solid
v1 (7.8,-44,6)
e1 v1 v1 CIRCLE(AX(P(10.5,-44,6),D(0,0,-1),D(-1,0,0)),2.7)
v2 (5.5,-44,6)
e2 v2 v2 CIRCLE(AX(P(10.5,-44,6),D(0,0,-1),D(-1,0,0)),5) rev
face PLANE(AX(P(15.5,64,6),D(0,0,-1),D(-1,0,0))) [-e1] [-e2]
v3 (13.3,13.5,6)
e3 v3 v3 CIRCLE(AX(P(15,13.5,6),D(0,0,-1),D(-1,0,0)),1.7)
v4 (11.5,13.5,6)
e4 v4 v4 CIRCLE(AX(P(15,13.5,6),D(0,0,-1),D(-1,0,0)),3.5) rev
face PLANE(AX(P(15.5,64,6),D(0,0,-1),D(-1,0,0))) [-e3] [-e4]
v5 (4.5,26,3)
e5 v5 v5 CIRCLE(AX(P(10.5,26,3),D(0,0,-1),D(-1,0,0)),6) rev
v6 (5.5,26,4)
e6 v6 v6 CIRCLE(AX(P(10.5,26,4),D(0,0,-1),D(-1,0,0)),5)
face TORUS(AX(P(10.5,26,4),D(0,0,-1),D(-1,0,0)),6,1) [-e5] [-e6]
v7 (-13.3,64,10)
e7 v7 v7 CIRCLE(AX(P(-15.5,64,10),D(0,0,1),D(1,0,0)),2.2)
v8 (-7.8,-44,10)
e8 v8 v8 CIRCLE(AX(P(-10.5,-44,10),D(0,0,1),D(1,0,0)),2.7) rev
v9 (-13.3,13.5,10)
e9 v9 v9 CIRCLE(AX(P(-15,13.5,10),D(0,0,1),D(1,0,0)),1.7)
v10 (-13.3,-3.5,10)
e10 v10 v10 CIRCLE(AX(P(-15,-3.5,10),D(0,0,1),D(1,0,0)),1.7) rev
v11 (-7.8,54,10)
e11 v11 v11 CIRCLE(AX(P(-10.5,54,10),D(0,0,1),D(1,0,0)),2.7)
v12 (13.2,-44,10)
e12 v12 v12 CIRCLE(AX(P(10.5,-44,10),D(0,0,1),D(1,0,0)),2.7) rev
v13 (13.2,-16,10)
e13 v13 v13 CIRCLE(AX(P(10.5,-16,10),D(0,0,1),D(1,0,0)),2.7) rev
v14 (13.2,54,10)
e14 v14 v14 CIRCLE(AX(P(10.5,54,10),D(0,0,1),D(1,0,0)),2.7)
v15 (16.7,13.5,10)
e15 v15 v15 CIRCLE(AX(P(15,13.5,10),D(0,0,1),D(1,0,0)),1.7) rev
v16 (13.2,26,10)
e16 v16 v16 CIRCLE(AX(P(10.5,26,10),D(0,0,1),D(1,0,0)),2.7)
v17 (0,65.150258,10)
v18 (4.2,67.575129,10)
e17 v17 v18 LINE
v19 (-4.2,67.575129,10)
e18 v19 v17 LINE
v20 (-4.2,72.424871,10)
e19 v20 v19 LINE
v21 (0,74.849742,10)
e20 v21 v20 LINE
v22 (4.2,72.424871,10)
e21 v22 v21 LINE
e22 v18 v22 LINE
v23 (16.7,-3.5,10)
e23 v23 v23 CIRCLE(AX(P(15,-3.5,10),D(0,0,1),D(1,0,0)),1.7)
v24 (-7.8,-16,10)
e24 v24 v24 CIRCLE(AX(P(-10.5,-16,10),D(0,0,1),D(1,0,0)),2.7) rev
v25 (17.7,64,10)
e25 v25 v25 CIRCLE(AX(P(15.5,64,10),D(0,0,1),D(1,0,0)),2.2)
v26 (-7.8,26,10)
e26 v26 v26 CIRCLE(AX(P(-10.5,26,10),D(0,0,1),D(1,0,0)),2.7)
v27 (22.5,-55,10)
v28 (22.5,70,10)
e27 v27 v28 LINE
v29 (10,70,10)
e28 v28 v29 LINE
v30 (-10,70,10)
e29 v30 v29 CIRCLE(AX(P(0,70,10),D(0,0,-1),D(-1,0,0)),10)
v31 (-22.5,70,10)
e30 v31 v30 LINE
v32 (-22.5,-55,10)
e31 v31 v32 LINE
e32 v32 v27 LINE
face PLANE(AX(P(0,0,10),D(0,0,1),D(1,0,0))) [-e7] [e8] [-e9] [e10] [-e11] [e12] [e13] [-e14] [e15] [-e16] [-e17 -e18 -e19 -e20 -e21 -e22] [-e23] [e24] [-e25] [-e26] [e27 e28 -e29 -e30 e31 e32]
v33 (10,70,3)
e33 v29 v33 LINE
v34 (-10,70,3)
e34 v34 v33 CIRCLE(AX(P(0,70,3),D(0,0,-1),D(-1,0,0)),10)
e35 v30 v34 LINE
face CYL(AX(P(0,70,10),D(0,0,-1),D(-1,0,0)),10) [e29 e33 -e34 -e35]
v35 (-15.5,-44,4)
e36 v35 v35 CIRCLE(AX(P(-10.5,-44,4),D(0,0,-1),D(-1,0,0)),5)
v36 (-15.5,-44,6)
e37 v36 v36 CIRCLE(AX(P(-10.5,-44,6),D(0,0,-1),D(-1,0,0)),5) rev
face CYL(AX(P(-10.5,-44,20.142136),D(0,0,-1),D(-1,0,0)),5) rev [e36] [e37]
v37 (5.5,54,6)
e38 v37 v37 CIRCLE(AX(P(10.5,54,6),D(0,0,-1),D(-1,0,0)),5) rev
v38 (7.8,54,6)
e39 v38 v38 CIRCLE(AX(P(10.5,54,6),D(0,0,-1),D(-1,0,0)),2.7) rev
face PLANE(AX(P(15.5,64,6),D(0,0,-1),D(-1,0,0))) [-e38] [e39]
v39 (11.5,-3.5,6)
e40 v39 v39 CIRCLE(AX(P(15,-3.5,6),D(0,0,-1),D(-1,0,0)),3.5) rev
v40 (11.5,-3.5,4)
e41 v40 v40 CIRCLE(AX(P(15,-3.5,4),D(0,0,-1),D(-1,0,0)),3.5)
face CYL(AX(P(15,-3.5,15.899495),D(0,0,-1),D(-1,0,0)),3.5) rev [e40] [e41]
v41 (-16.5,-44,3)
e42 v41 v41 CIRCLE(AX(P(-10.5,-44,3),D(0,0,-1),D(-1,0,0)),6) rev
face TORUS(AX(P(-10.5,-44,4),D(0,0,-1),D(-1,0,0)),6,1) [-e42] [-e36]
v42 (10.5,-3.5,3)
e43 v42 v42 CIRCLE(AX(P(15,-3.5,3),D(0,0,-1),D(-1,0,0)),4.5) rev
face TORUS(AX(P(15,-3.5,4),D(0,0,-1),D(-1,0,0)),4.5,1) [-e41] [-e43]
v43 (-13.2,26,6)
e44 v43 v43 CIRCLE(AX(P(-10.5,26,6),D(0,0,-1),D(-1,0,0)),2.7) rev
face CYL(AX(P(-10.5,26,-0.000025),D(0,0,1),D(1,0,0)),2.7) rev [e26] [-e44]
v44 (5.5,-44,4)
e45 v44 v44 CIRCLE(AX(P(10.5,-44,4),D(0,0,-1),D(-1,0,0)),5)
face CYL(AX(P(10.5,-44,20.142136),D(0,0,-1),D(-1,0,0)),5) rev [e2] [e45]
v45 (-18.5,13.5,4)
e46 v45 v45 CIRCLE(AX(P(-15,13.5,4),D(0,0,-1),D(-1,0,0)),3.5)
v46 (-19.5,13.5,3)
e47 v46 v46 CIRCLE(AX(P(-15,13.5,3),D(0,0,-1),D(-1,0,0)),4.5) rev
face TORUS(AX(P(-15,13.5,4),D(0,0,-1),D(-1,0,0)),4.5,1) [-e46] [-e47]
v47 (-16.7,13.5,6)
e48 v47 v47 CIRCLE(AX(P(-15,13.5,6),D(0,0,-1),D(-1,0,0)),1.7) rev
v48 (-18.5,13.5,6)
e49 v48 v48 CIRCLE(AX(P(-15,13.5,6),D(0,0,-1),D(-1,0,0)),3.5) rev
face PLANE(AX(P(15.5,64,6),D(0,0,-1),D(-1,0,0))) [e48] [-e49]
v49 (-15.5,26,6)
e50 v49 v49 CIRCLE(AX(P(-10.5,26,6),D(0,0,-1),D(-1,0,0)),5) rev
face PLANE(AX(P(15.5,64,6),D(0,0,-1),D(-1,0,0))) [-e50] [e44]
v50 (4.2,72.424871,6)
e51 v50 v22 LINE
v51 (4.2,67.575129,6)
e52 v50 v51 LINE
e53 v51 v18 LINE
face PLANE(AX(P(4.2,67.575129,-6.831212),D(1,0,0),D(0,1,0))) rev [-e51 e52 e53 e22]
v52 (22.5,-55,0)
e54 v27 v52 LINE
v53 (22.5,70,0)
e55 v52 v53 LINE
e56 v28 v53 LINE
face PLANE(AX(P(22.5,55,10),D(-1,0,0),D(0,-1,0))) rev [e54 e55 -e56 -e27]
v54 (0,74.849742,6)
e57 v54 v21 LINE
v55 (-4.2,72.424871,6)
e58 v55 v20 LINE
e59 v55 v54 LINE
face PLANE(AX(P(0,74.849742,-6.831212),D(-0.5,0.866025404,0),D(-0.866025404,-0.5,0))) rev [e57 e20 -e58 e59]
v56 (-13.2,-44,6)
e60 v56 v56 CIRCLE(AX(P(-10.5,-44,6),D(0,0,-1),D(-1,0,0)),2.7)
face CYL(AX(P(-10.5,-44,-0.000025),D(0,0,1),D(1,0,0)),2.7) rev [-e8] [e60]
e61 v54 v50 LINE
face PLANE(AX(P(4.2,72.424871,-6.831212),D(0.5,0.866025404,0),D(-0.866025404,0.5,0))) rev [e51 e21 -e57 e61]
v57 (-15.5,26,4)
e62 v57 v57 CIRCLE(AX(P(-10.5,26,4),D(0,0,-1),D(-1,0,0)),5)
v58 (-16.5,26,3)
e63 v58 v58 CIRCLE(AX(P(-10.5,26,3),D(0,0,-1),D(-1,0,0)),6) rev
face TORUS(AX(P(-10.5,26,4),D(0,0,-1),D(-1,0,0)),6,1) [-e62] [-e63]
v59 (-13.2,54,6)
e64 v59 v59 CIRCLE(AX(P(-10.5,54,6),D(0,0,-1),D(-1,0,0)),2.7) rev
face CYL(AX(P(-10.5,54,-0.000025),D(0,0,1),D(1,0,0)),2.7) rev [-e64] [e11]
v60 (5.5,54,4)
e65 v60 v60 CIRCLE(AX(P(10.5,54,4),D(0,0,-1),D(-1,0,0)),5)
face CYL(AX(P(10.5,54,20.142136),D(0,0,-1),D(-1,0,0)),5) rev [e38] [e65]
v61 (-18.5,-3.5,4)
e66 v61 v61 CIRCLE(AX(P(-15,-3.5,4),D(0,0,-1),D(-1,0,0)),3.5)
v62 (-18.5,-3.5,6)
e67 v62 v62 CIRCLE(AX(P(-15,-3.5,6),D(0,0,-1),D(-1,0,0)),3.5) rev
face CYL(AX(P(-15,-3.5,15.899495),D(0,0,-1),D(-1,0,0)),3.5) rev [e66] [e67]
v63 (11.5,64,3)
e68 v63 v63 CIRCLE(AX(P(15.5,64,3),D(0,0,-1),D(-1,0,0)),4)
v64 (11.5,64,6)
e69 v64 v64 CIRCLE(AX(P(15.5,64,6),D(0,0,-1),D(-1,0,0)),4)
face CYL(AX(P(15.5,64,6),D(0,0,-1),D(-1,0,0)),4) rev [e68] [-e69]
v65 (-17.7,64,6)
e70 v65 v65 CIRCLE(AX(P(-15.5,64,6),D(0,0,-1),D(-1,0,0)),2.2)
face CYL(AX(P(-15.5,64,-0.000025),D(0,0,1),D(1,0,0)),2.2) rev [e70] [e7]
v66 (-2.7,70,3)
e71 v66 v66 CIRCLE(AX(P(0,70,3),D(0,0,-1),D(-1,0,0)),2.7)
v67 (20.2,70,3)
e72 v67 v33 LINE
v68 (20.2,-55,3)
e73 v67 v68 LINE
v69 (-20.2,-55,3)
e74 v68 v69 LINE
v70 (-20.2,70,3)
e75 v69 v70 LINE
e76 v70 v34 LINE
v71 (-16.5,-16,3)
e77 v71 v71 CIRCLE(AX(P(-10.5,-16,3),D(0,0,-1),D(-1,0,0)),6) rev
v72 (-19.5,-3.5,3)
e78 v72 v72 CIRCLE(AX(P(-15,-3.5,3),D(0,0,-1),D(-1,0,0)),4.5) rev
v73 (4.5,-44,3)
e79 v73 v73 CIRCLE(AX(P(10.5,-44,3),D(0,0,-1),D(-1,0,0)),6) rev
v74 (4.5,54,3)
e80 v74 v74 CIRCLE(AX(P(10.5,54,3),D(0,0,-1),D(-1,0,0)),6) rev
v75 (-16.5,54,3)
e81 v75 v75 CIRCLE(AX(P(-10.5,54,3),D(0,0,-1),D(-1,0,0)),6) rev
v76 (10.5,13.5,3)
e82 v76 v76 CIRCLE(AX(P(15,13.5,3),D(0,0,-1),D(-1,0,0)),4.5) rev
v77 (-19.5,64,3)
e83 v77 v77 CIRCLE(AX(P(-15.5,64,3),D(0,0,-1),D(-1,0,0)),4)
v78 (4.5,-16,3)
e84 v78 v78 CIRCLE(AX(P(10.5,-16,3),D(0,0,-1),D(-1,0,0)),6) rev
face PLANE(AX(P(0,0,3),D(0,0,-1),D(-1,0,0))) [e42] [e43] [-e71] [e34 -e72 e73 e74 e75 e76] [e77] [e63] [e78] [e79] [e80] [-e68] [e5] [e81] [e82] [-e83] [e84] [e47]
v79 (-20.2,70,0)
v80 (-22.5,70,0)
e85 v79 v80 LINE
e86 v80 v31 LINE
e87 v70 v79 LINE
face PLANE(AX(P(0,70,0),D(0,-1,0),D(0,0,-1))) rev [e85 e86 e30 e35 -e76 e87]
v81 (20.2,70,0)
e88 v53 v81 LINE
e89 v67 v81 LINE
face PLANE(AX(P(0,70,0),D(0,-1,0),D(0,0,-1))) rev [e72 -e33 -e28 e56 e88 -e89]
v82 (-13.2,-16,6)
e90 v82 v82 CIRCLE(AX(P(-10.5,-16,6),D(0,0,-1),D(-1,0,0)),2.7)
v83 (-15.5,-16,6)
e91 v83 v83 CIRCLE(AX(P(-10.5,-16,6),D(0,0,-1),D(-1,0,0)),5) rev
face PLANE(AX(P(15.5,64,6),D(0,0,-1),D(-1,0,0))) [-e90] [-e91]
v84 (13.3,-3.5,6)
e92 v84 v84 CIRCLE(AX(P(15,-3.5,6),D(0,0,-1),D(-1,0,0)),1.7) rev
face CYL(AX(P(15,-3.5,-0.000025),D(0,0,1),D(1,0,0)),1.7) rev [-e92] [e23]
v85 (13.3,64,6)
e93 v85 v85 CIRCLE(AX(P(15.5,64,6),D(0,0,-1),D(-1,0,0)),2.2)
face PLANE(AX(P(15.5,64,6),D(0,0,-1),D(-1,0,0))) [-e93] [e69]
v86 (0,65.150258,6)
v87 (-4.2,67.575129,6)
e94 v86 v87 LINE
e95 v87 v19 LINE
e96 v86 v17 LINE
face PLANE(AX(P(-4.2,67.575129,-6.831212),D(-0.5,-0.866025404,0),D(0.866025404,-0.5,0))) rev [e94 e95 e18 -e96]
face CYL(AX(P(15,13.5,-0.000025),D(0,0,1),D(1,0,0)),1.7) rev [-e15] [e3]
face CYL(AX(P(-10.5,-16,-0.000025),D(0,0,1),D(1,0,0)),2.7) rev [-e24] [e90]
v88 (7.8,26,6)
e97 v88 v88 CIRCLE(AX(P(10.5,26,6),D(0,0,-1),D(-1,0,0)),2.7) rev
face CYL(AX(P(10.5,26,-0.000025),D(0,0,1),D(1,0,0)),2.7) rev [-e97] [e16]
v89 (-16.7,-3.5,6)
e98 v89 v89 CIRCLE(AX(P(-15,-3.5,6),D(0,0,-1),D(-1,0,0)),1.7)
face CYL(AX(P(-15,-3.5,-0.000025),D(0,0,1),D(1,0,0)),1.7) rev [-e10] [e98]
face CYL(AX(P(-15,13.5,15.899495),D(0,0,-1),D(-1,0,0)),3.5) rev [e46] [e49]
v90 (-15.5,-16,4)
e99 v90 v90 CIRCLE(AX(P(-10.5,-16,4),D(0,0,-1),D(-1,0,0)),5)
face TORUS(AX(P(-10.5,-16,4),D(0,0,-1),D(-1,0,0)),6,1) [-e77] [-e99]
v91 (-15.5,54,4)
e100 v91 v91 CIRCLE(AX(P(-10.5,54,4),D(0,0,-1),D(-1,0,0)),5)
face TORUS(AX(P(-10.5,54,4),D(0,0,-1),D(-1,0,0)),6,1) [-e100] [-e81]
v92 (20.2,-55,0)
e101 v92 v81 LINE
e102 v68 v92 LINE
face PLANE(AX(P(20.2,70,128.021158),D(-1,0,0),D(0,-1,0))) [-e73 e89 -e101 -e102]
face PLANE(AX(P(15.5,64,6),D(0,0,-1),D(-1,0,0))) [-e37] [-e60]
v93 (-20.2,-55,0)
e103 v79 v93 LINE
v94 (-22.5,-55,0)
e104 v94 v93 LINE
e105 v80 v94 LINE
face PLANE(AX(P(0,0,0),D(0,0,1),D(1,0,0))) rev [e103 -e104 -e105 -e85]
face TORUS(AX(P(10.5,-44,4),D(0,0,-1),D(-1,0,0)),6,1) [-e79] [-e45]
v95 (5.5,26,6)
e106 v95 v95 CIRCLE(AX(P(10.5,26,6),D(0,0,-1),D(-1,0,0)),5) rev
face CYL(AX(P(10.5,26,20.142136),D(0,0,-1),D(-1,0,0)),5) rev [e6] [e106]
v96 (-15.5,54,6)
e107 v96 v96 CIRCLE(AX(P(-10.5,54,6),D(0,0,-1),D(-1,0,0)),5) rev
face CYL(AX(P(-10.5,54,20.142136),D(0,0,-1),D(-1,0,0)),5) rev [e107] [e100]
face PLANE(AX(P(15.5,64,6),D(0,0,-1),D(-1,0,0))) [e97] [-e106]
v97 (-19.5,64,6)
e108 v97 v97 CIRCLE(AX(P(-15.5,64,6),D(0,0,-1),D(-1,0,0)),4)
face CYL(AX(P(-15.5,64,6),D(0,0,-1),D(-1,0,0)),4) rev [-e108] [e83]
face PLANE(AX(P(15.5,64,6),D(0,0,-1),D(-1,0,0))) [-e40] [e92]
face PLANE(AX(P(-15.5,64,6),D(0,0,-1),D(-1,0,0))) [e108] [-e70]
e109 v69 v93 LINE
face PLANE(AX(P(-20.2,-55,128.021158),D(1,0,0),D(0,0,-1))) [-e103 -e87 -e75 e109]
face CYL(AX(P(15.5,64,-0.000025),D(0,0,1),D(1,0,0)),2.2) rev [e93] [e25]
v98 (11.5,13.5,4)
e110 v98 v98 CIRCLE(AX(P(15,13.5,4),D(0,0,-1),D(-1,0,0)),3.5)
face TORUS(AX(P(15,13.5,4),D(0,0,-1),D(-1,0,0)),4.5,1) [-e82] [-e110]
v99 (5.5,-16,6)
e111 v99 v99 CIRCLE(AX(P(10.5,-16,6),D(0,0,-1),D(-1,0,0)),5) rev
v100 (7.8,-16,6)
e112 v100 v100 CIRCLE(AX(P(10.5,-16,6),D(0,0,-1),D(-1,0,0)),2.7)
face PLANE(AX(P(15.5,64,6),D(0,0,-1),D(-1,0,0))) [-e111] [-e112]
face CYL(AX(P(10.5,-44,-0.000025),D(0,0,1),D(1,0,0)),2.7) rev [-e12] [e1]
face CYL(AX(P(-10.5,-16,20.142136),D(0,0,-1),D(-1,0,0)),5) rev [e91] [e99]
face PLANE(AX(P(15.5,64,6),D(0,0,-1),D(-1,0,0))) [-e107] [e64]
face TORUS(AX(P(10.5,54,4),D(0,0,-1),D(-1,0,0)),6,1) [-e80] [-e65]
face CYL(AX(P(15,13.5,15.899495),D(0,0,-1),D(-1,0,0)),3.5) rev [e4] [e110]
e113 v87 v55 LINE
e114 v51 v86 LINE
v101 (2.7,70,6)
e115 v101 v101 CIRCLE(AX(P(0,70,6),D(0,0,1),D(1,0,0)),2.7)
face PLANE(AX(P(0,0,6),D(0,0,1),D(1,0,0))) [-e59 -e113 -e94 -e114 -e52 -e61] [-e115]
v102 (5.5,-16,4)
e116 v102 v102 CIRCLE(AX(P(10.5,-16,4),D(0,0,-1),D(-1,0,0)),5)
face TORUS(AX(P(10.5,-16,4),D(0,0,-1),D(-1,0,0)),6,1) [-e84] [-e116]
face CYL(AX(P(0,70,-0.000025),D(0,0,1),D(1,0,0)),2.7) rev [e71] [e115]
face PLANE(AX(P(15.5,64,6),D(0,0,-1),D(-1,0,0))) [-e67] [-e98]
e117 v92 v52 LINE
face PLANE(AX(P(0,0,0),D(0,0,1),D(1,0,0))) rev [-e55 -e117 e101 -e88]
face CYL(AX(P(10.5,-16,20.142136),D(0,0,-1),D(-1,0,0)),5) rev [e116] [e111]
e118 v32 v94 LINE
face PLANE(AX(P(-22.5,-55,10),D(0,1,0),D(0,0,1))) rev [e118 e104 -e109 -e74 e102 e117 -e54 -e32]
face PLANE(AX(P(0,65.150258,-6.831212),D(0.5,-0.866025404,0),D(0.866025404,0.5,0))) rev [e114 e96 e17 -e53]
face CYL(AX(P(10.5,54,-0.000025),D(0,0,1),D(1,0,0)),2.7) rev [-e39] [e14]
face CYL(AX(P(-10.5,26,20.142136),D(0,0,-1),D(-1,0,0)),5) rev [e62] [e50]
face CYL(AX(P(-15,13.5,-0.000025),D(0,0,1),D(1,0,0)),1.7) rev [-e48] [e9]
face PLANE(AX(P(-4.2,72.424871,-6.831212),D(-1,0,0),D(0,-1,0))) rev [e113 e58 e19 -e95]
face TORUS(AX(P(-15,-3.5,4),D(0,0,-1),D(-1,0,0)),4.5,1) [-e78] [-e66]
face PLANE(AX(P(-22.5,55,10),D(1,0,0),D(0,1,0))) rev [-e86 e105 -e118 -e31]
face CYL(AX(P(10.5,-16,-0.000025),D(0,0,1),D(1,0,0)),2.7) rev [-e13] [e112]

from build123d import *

# Parameters (mm, degrees)
SKETCH_1_W               = 45
SKETCH_1_H               = 110
EXTRUDE_1_DEPTH          = 10
SKETCH_2_W               = 41
SKETCH_2_H               = 110
CUT_EXTRUDE_1_DEPTH      = 3
EXTRUDE_2_DEPTH          = 15
SKETCH_9_R               = 2.5
CUT_EXTRUDE_6_DEPTH      = 75.204110398
CHAMFER_3_SIZE           = 2
EXTRUDE_3_DEPTH          = 10
CUT_EXTRUDE_9_DEPTH      = 84.398141466
CUT_EXTRUDE_10_DEPTH     = 4
SKETCH_14_R              = 2.5
CUT_EXTRUDE_11_DEPTH     = 84.703345214
SKETCH_18_R              = 1.5
CUT_EXTRUDE_12_DEPTH     = 84.703345214
SKETCH_19_R              = 3
CUT_EXTRUDE_13_DEPTH     = 3
SKETCH_20_R              = 4
CUT_EXTRUDE_14_DEPTH     = 3
CHAMFER_4_SIZE           = 1
SKETCH_22_R              = 2
CUT_EXTRUDE_15_DEPTH     = 84.703345214
SKETCH_23_R              = 4
CUT_EXTRUDE_16_DEPTH     = 3
CHAMFER_6_SIZE           = 0.5
SKETCH_24_R              = 2.7
CUT_EXTRUDE_17_DEPTH     = 84.703345214
CUT_EXTRUDE_18_DEPTH     = 4
SKETCH_26_R              = 1.7
CUT_EXTRUDE_19_DEPTH     = 84.703345214
SKETCH_27_R              = 2.2
CUT_EXTRUDE_20_DEPTH     = 84.703345214
SKETCH_28_R              = 4.7
CUT_EXTRUDE_21_DEPTH     = 3
FILLET_1_R               = 1
FILLET_2_R               = 1
SKETCH_29_R              = 5.7
EXTRUDE_4_DEPTH          = 3
SKETCH_30_R              = 2.7
EXTRUDE_5_DEPTH          = 3
CUT_EXTRUDE_START        = -7
CUT_EXTRUDE_22_OUTLINE_R = 2.7
CUT_EXTRUDE_22_DEPTH     = 7
SKETCH_32_R              = 2.7
EXTRUDE_6_DEPTH          = 3
CUT_EXTRUDE_23_OUTLINE_R = 2.7
CUT_EXTRUDE_23_DEPTH     = 7
EXTRUDE_7_REACH          = 85.703
SKETCH_35_R              = 6.776750131
SKETCH_35_R_2            = 7.007153008
SKETCH_35_R_3            = 7.350593446
SKETCH_35_R_4            = 7.056321553
SKETCH_36_R              = 2.7
CUT_EXTRUDE_25_DEPTH     = 84.703345214
EXTRUDE_START            = -7
SKETCH_37_R              = 6.917047826
SKETCH_37_R_2            = 2.7
SKETCH_37_R_3            = 7.137636353
SKETCH_37_R_4            = 7.213157971
SKETCH_37_R_5            = 7.230640972
EXTRUDE_8_DEPTH          = 7
SKETCH_38_R              = 5.066348775
SKETCH_38_R_2            = 5.169326328
SKETCH_38_R_3            = 5.147369905
SKETCH_38_R_4            = 5.241001726
EXTRUDE_9_DEPTH          = 7
SKETCH_39_R              = 1.7
CUT_EXTRUDE_26_DEPTH     = 84.703345214
SKETCH_40_R              = 4.793714361
SKETCH_40_R_2            = 4
SKETCH_40_R_3            = 4.918414757
EXTRUDE_10_DEPTH         = 3
SKETCH_41_R              = 3.5
CUT_EXTRUDE_28_DEPTH     = 3
FILLET_3_R               = 1
SKETCH_42_R              = 5
CUT_EXTRUDE_29_DEPTH     = 3
FILLET_4_R               = 1
SKETCH_43_W              = 2.3
SKETCH_43_H              = 125
EXTRUDE_11_DEPTH         = 3


# Read off the part's stored shape, not the designer's step: Вырез-Вытянуть22, Вырез-Вытянуть23
with BuildPart() as part:
    # Эскиз1 → Бобышка-Вытянуть1 (new body)
    with BuildSketch(Plane.XY):
        Rectangle(SKETCH_1_W, SKETCH_1_H)
    extrude(amount=EXTRUDE_1_DEPTH)

    # Эскиз2 → Вырез-Вытянуть1 (cut)
    with BuildSketch(Plane(origin=(0, 0, 0), x_dir=(-1, 0, 0), z_dir=(0, 0, -1))):
        Rectangle(SKETCH_2_W, SKETCH_2_H)
    extrude(amount=-CUT_EXTRUDE_1_DEPTH, mode=Mode.SUBTRACT)

    # Эскиз6 → Бобышка-Вытянуть2 (add)
    with BuildSketch(Plane(origin=(0, 55, 0), x_dir=(1, 0, 0), z_dir=(0, 1, 0))):
        Polygon((-22.5, -10), (-22.5, 0), (-20.5, 0), (-20.5, -3), (20.5, -3), (20.5, 0), (22.5, 0), (22.5, -10), align=None)
    extrude(amount=EXTRUDE_2_DEPTH)

    # Эскиз9 → Вырез-Вытянуть6 (cut, through all)
    with BuildSketch(Plane.XY.offset(10)):
        with Locations((10.5, -45)):
            Circle(SKETCH_9_R)
        with Locations((-10.5, 25)):
            Circle(SKETCH_9_R)
        with Locations((-10.5, -45)):
            Circle(SKETCH_9_R)
        with Locations((10.5, -15)):
            Circle(SKETCH_9_R)
        with Locations((-10.5, -15)):
            Circle(SKETCH_9_R)
        with Locations((10.5, 25)):
            Circle(SKETCH_9_R)
        with Locations((-10.5, 55)):
            Circle(SKETCH_9_R)
        with Locations((10.5, 55)):
            Circle(SKETCH_9_R)
    extrude(amount=-CUT_EXTRUDE_6_DEPTH, mode=Mode.SUBTRACT)

    # Фаска3
    chamfer_3_edges = [part.edges().sort_by_distance(p)[0] for p in [
        (-13, 55, 3),
        (8, 55, 3),
        (8, 25, 3),
        (-13, 25, 3),
        (8, -15, 3),
        (-13, -15, 3),
        (8, -45, 3),
        (-13, -45, 3),
    ]]
    chamfer(chamfer_3_edges, length=CHAMFER_3_SIZE)

    # Эскиз10 → Бобышка-Вытянуть3 (add)
    with BuildSketch(Plane(origin=(0, 70, 0), x_dir=(1, 0, 0), z_dir=(0, 1, 0))):
        Polygon((-20.5, -3), (22.5, -3), (22.5, -10), (-22.5, -10), (-22.5, -3), align=None)
    extrude(amount=EXTRUDE_3_DEPTH)

    # Эскиз11 → Вырез-Вытянуть9 (cut, through all)
    with BuildSketch(Plane(origin=(0, 0, 3), x_dir=(-1, 0, 0), z_dir=(0, 0, -1))):
        with BuildLine():
            Line((0, 80), (-22.5, 80))
            Line((-22.5, 80), (-22.5, 70))
            Line((-22.5, 70), (-20.5, 70))
            Line((-20.5, 70), (-10, 70))
            ThreePointArc((-10, 70), (-7.071067812, 77.071067812), (0, 80))
        make_face()
        with BuildLine():
            Line((22.5, 80), (0, 80))
            ThreePointArc((0, 80), (7.071067812, 77.071067812), (10, 70))
            Line((10, 70), (20.5, 70))
            Line((20.5, 70), (22.5, 70))
            Line((22.5, 70), (22.5, 80))
        make_face()
    extrude(amount=-CUT_EXTRUDE_9_DEPTH, mode=Mode.SUBTRACT)

    # Эскиз13 → Вырез-Вытянуть10 (cut)
    with BuildSketch(Plane.XY.offset(10)):
        Polygon((-4, 72.309401077), (-4, 70), (4, 70), (4, 72.309401077), (0, 74.618802154), align=None)
        Polygon((4, 70), (-4, 70), (-4, 67.690598923), (0, 65.381197846), (4, 67.690598923), align=None)
    extrude(amount=-CUT_EXTRUDE_10_DEPTH, mode=Mode.SUBTRACT)

    # Эскиз14 → Вырез-Вытянуть11 (cut, through all)
    with BuildSketch(Plane.XY.offset(10)):
        with Locations((0, 70)):
            Circle(SKETCH_14_R)
    extrude(amount=-CUT_EXTRUDE_11_DEPTH, mode=Mode.SUBTRACT)

    # Эскиз18 → Вырез-Вытянуть12 (cut, through all)
    with BuildSketch(Plane.XY.offset(10)):
        with BuildLine():
            ThreePointArc((-15, -5), (-16.060660172, -5.439339828), (-16.5, -6.5))
            Line((-16.5, -6.5), (-15, -6.5))
            Line((-15, -6.5), (-15, -5))
        make_face()
        with BuildLine():
            Line((-15, -6.5), (-16.5, -6.5))
            ThreePointArc((-16.5, -6.5), (-15, -8), (-13.5, -6.5))
            ThreePointArc((-13.5, -6.5), (-13.939339828, -5.439339828), (-15, -5))
            Line((-15, -5), (-15, -6.5))
        make_face()
        with Locations((15, -6.5)):
            Circle(SKETCH_18_R)
        with Locations((15, 10.5)):
            Circle(SKETCH_18_R)
        with Locations((-15, 10.5)):
            Circle(SKETCH_18_R)
    extrude(amount=-CUT_EXTRUDE_12_DEPTH, mode=Mode.SUBTRACT)

    # Эскиз19 → Вырез-Вытянуть13 (cut)
    with BuildSketch(Plane(origin=(0, 0, 3), x_dir=(-1, 0, 0), z_dir=(0, 0, -1))):
        with Locations((-15, 10.5)):
            Circle(SKETCH_19_R)
        with Locations((15, 10.5)):
            Circle(SKETCH_19_R)
        with Locations((15, -6.5)):
            Circle(SKETCH_19_R)
        with Locations((-15, -6.5)):
            Circle(SKETCH_19_R)
    extrude(amount=-CUT_EXTRUDE_13_DEPTH, mode=Mode.SUBTRACT)

    # Эскиз20 → Вырез-Вытянуть14 (cut)
    with BuildSketch(Plane(origin=(0, 0, 3), x_dir=(-1, 0, 0), z_dir=(0, 0, -1))):
        with Locations((-10.5, -15)):
            Circle(SKETCH_20_R)
        with Locations((10.5, -15)):
            Circle(SKETCH_20_R)
        with Locations((10.5, -45)):
            Circle(SKETCH_20_R)
        with Locations((-10.5, -45)):
            Circle(SKETCH_20_R)
        with Locations((-10.5, 25)):
            Circle(SKETCH_20_R)
        with Locations((10.5, 25)):
            Circle(SKETCH_20_R)
        with Locations((10.5, 55)):
            Circle(SKETCH_20_R)
        with Locations((-10.5, 55)):
            Circle(SKETCH_20_R)
    extrude(amount=-CUT_EXTRUDE_14_DEPTH, mode=Mode.SUBTRACT)

    # Фаска4
    chamfer_4_edges = [part.edges().sort_by_distance(p)[0] for p in [
        (18, 10.5, 3),
        (-12, 10.5, 3),
        (-12, -6.5, 3),
        (18, -6.5, 3),
    ]]
    chamfer(chamfer_4_edges, length=CHAMFER_4_SIZE)

    # Эскиз22 → Вырез-Вытянуть15 (cut, through all)
    with BuildSketch(Plane.XY.offset(10)):
        with Locations((-15.5, 64)):
            Circle(SKETCH_22_R)
        with Locations((15.5, 64)):
            Circle(SKETCH_22_R)
    extrude(amount=-CUT_EXTRUDE_15_DEPTH, mode=Mode.SUBTRACT)

    # Эскиз23 → Вырез-Вытянуть16 (cut)
    with BuildSketch(Plane(origin=(0, 0, 3), x_dir=(-1, 0, 0), z_dir=(0, 0, -1))):
        with Locations((-15.5, 64)):
            Circle(SKETCH_23_R)
        with Locations((15.5, 64)):
            Circle(SKETCH_23_R)
    extrude(amount=-CUT_EXTRUDE_16_DEPTH, mode=Mode.SUBTRACT)

    # Фаска6
    chamfer_6_edges = [part.edges().sort_by_distance(p)[0] for p in [
        (19.5, 64, 3),
        (-11.5, 64, 3),
    ]]
    chamfer(chamfer_6_edges, length=CHAMFER_6_SIZE)

    # Эскиз24 → Вырез-Вытянуть17 (cut, through all)
    with BuildSketch(Plane.XY.offset(10)):
        with Locations((0, 70)):
            Circle(SKETCH_24_R)
        with Locations((-10.5, 55)):
            Circle(SKETCH_24_R)
        with Locations((10.5, 55)):
            Circle(SKETCH_24_R)
        with Locations((-10.5, 25)):
            Circle(SKETCH_24_R)
        with Locations((10.5, 25)):
            Circle(SKETCH_24_R)
        with Locations((-10.5, -15)):
            Circle(SKETCH_24_R)
        with Locations((10.5, -15)):
            Circle(SKETCH_24_R)
        with Locations((-10.5, -45)):
            Circle(SKETCH_24_R)
        with Locations((10.5, -45)):
            Circle(SKETCH_24_R)
    extrude(amount=-CUT_EXTRUDE_17_DEPTH, mode=Mode.SUBTRACT)

    # Эскиз25 → Вырез-Вытянуть18 (cut)
    with BuildSketch(Plane.XY.offset(10)):
        Polygon((0, 65.150257739), (4.2, 67.575128869), (4.2, 72.424871131), (0, 74.849742261), (-4.2, 72.424871131), (-4.2, 67.575128869), align=None)
    extrude(amount=-CUT_EXTRUDE_18_DEPTH, mode=Mode.SUBTRACT)

    # Эскиз26 → Вырез-Вытянуть19 (cut, through all)
    with BuildSketch(Plane.XY.offset(10)):
        with Locations((-15.5, 64)):
            Circle(SKETCH_26_R)
        with Locations((15.5, 64)):
            Circle(SKETCH_26_R)
        with Locations((-15, 10.5)):
            Circle(SKETCH_26_R)
        with Locations((15, 10.5)):
            Circle(SKETCH_26_R)
        with Locations((15, -6.5)):
            Circle(SKETCH_26_R)
        with Locations((-15, -6.5)):
            Circle(SKETCH_26_R)
    extrude(amount=-CUT_EXTRUDE_19_DEPTH, mode=Mode.SUBTRACT)

    # Эскиз27 → Вырез-Вытянуть20 (cut, through all)
    with BuildSketch(Plane.XY.offset(10)):
        with Locations((-15.5, 64)):
            Circle(SKETCH_27_R)
        with Locations((15.5, 64)):
            Circle(SKETCH_27_R)
    extrude(amount=-CUT_EXTRUDE_20_DEPTH, mode=Mode.SUBTRACT)

    # Эскиз28 → Вырез-Вытянуть21 (cut)
    with BuildSketch(Plane(origin=(0, 0, 3), x_dir=(-1, 0, 0), z_dir=(0, 0, -1))):
        with Locations((-10.5, -45)):
            Circle(SKETCH_28_R)
        with Locations((10.5, -45)):
            Circle(SKETCH_28_R)
        with Locations((-10.5, -15)):
            Circle(SKETCH_28_R)
        with Locations((10.5, -15)):
            Circle(SKETCH_28_R)
        with Locations((-10.5, 25)):
            Circle(SKETCH_28_R)
        with Locations((10.5, 25)):
            Circle(SKETCH_28_R)
        with Locations((-10.5, 55)):
            Circle(SKETCH_28_R)
        with Locations((10.5, 55)):
            Circle(SKETCH_28_R)
    extrude(amount=-CUT_EXTRUDE_21_DEPTH, mode=Mode.SUBTRACT)

    # Скругление1
    # the kernel refuses this fillet: 1 mm, written as the material it takes off along each edge
    with BuildSketch(Plane(origin=(10.5, -45, 3), x_dir=(-1, 0, 0), z_dir=(0, -1, 0))) as fillet_1_piece_1:
        with BuildLine():
            CenterArc((4.7 + FILLET_1_R, -FILLET_1_R), FILLET_1_R, 90, 90)
            Line((4.7, -FILLET_1_R), (4.7, 0))
            Line((4.7, 0), (4.7 + FILLET_1_R, 0))
        make_face()
    revolve(axis=Axis((10.5, -45, 3), (0, 0, -1)), mode=Mode.SUBTRACT)
    with BuildSketch(Plane(origin=(-10.5, -45, 3), x_dir=(-1, 0, 0), z_dir=(0, -1, 0))) as fillet_1_piece_2:
        with BuildLine():
            CenterArc((4.7 + FILLET_1_R, -FILLET_1_R), FILLET_1_R, 90, 90)
            Line((4.7, -FILLET_1_R), (4.7, 0))
            Line((4.7, 0), (4.7 + FILLET_1_R, 0))
        make_face()
    revolve(axis=Axis((-10.5, -45, 3), (0, 0, -1)), mode=Mode.SUBTRACT)
    with BuildSketch(Plane(origin=(10.5, -15, 3), x_dir=(-1, 0, 0), z_dir=(0, -1, 0))) as fillet_1_piece_3:
        with BuildLine():
            CenterArc((4.7 + FILLET_1_R, -FILLET_1_R), FILLET_1_R, 90, 90)
            Line((4.7, -FILLET_1_R), (4.7, 0))
            Line((4.7, 0), (4.7 + FILLET_1_R, 0))
        make_face()
    revolve(axis=Axis((10.5, -15, 3), (0, 0, -1)), mode=Mode.SUBTRACT)
    with BuildSketch(Plane(origin=(-10.5, -15, 3), x_dir=(-1, 0, 0), z_dir=(0, -1, 0))) as fillet_1_piece_4:
        with BuildLine():
            CenterArc((4.7 + FILLET_1_R, -FILLET_1_R), FILLET_1_R, 90, 90)
            Line((4.7, -FILLET_1_R), (4.7, 0))
            Line((4.7, 0), (4.7 + FILLET_1_R, 0))
        make_face()
    revolve(axis=Axis((-10.5, -15, 3), (0, 0, -1)), mode=Mode.SUBTRACT)
    with BuildSketch(Plane(origin=(10.5, 25, 3), x_dir=(-1, 0, 0), z_dir=(0, -1, 0))) as fillet_1_piece_5:
        with BuildLine():
            CenterArc((4.7 + FILLET_1_R, -FILLET_1_R), FILLET_1_R, 90, 90)
            Line((4.7, -FILLET_1_R), (4.7, 0))
            Line((4.7, 0), (4.7 + FILLET_1_R, 0))
        make_face()
    revolve(axis=Axis((10.5, 25, 3), (0, 0, -1)), mode=Mode.SUBTRACT)
    with BuildSketch(Plane(origin=(-10.5, 25, 3), x_dir=(-1, 0, 0), z_dir=(0, -1, 0))) as fillet_1_piece_6:
        with BuildLine():
            CenterArc((4.7 + FILLET_1_R, -FILLET_1_R), FILLET_1_R, 90, 90)
            Line((4.7, -FILLET_1_R), (4.7, 0))
            Line((4.7, 0), (4.7 + FILLET_1_R, 0))
        make_face()
    revolve(axis=Axis((-10.5, 25, 3), (0, 0, -1)), mode=Mode.SUBTRACT)
    with BuildSketch(Plane(origin=(10.5, 55, 3), x_dir=(-1, 0, 0), z_dir=(0, -1, 0))) as fillet_1_piece_7:
        with BuildLine():
            CenterArc((4.7 + FILLET_1_R, -FILLET_1_R), FILLET_1_R, 90, 90)
            Line((4.7, -FILLET_1_R), (4.7, 0))
            Line((4.7, 0), (4.7 + FILLET_1_R, 0))
        make_face()
    revolve(axis=Axis((10.5, 55, 3), (0, 0, -1)), mode=Mode.SUBTRACT)
    with BuildSketch(Plane(origin=(-10.5, 55, 3), x_dir=(-1, 0, 0), z_dir=(0, -1, 0))) as fillet_1_piece_8:
        with BuildLine():
            CenterArc((4.7 + FILLET_1_R, -FILLET_1_R), FILLET_1_R, 90, 90)
            Line((4.7, -FILLET_1_R), (4.7, 0))
            Line((4.7, 0), (4.7 + FILLET_1_R, 0))
        make_face()
    revolve(axis=Axis((-10.5, 55, 3), (0, 0, -1)), mode=Mode.SUBTRACT)

    # Скругление2
    fillet_2_edges = [part.edges().sort_by_distance(p)[0] for p in [
        (-13.2, 55, 6),
        (7.8, 55, 6),
        (-13.2, 25, 6),
        (7.8, 25, 6),
        (-13.2, -15, 6),
        (7.8, -15, 6),
        (-13.2, -45, 6),
        (7.8, -45, 6),
    ]]
    fillet(fillet_2_edges, radius=FILLET_2_R)

    # Эскиз29 → Бобышка-Вытянуть4 (add)
    with BuildSketch(Plane(origin=(0, 0, 3), x_dir=(-1, 0, 0), z_dir=(0, 0, -1))):
        with Locations((-10.5, 55)):
            Circle(SKETCH_29_R)
        with Locations((10.5, 55)):
            Circle(SKETCH_29_R)
        with Locations((-10.5, 25)):
            Circle(SKETCH_29_R)
        with Locations((10.5, 25)):
            Circle(SKETCH_29_R)
        with Locations((-10.5, -15)):
            Circle(SKETCH_29_R)
        with Locations((10.5, -15)):
            Circle(SKETCH_29_R)
        with Locations((-10.5, -45)):
            Circle(SKETCH_29_R)
        with Locations((10.5, -45)):
            Circle(SKETCH_29_R)
    extrude(amount=-EXTRUDE_4_DEPTH)

    # Эскиз30 → Бобышка-Вытянуть5 (add)
    with BuildSketch(Plane.XY.offset(10)):
        with Locations((-10.5, 55)):
            Circle(SKETCH_30_R)
        with Locations((10.5, 25)):
            Circle(SKETCH_30_R)
    extrude(amount=-EXTRUDE_5_DEPTH)

    # Вырез-Вытянуть22 outline → Вырез-Вытянуть22 (cut)
    with BuildSketch(Plane.XY.offset(10).offset(CUT_EXTRUDE_START)):
        with Locations((-10.5, 54)):
            Circle(CUT_EXTRUDE_22_OUTLINE_R)
        with Locations((10.5, 26)):
            Circle(CUT_EXTRUDE_22_OUTLINE_R)
    extrude(amount=CUT_EXTRUDE_22_DEPTH, mode=Mode.SUBTRACT)

    # Эскиз32 → Бобышка-Вытянуть6 (add)
    with BuildSketch(Plane.XY.offset(10)):
        with Locations((10.5, 55)):
            Circle(SKETCH_32_R)
        with Locations((-10.5, 25)):
            Circle(SKETCH_32_R)
    extrude(amount=-EXTRUDE_6_DEPTH)

    # Вырез-Вытянуть23 outline → Вырез-Вытянуть23 (cut)
    with BuildSketch(Plane.XY.offset(10).offset(CUT_EXTRUDE_START)):
        with Locations((-10.5, 26)):
            Circle(CUT_EXTRUDE_23_OUTLINE_R)
        with Locations((10.5, 54)):
            Circle(CUT_EXTRUDE_23_OUTLINE_R)
    extrude(amount=CUT_EXTRUDE_23_DEPTH, mode=Mode.SUBTRACT)

    # Бобышка-Вытянуть7: up to this face of the body (flat: up to its plane)
    extrude_7_end = Plane(part.part.faces().sort_by_distance((0, 7.49796957, 3))[0])
    # Эскиз35 → Бобышка-Вытянуть7 (add, up to the picked face)
    with BuildSketch(Plane.XY.offset(10), mode=Mode.PRIVATE) as extrude_7_sk1:
        with Locations((-10.5, -15)):
            Circle(SKETCH_35_R)
    extrude_7_tool1 = split(extrude(extrude_7_sk1.sketch, amount=-EXTRUDE_7_REACH, mode=Mode.PRIVATE), bisect_by=extrude_7_end, keep=Keep.BOTH, mode=Mode.PRIVATE)
    # Эскиз35 → Бобышка-Вытянуть7 (add, up to the picked face)
    with BuildSketch(Plane.XY.offset(10), mode=Mode.PRIVATE) as extrude_7_sk2:
        with Locations((10.5, -15)):
            Circle(SKETCH_35_R_2)
    extrude_7_tool2 = split(extrude(extrude_7_sk2.sketch, amount=-EXTRUDE_7_REACH, mode=Mode.PRIVATE), bisect_by=extrude_7_end, keep=Keep.BOTH, mode=Mode.PRIVATE)
    # Эскиз35 → Бобышка-Вытянуть7 (add, up to the picked face)
    with BuildSketch(Plane.XY.offset(10), mode=Mode.PRIVATE) as extrude_7_sk3:
        with Locations((10.5, -45)):
            Circle(SKETCH_35_R_3)
    extrude_7_tool3 = split(extrude(extrude_7_sk3.sketch, amount=-EXTRUDE_7_REACH, mode=Mode.PRIVATE), bisect_by=extrude_7_end, keep=Keep.BOTH, mode=Mode.PRIVATE)
    # Эскиз35 → Бобышка-Вытянуть7 (add, up to the picked face)
    with BuildSketch(Plane.XY.offset(10), mode=Mode.PRIVATE) as extrude_7_sk4:
        with Locations((-10.5, -45)):
            Circle(SKETCH_35_R_4)
    extrude_7_tool4 = split(extrude(extrude_7_sk4.sketch, amount=-EXTRUDE_7_REACH, mode=Mode.PRIVATE), bisect_by=extrude_7_end, keep=Keep.BOTH, mode=Mode.PRIVATE)
    add(extrude_7_tool1.solids().sort_by(Axis((-10.5, -15, 10), (0, 0, -1)))[0])
    add(extrude_7_tool2.solids().sort_by(Axis((10.5, -15, 10), (0, 0, -1)))[0])
    add(extrude_7_tool3.solids().sort_by(Axis((10.5, -45, 10), (0, 0, -1)))[0])
    add(extrude_7_tool4.solids().sort_by(Axis((-10.5, -45, 10), (0, 0, -1)))[0])

    # Эскиз36 → Вырез-Вытянуть25 (cut, through all)
    with BuildSketch(Plane.XY.offset(10)):
        with Locations((-10.5, -16)):
            Circle(SKETCH_36_R)
        with Locations((10.5, -16)):
            Circle(SKETCH_36_R)
        with Locations((-10.5, -44)):
            Circle(SKETCH_36_R)
        with Locations((10.5, -44)):
            Circle(SKETCH_36_R)
    extrude(amount=-CUT_EXTRUDE_25_DEPTH, mode=Mode.SUBTRACT)

    # Эскиз37 → Бобышка-Вытянуть8 (add)
    # profile 1 of 4: a face of its own
    with BuildSketch(Plane.XY.offset(10).offset(EXTRUDE_START)):
        with Locations((-10.5, 54)):
            Circle(SKETCH_37_R)
        with Locations((-10.5, 54)):
            Circle(SKETCH_37_R_2, mode=Mode.SUBTRACT)
    # profile 2 of 4: a face of its own
    with BuildSketch(Plane.XY.offset(10).offset(EXTRUDE_START)):
        with Locations((10.5, 54)):
            Circle(SKETCH_37_R_3)
        with Locations((10.5, 54)):
            Circle(SKETCH_37_R_2, mode=Mode.SUBTRACT)
    # profile 3 of 4: a face of its own
    with BuildSketch(Plane.XY.offset(10).offset(EXTRUDE_START)):
        with Locations((-10.5, 26)):
            Circle(SKETCH_37_R_4)
        with Locations((-10.5, 26)):
            Circle(SKETCH_37_R_2, mode=Mode.SUBTRACT)
    # profile 4 of 4: a face of its own
    with BuildSketch(Plane.XY.offset(10).offset(EXTRUDE_START)):
        with Locations((10.5, 26)):
            Circle(SKETCH_37_R_5)
        with Locations((10.5, 26)):
            Circle(SKETCH_37_R_2, mode=Mode.SUBTRACT)
    extrude(amount=EXTRUDE_8_DEPTH)

    # Эскиз38 → Бобышка-Вытянуть9 (add)
    with BuildSketch(Plane(origin=(0, 0, 3), x_dir=(-1, 0, 0), z_dir=(0, 0, -1))):
        with Locations((-15, 10.5)):
            Circle(SKETCH_38_R)
        with Locations((15, 10.5)):
            Circle(SKETCH_38_R_2)
        with Locations((15, -6.5)):
            Circle(SKETCH_38_R_3)
        with Locations((-15, -6.5)):
            Circle(SKETCH_38_R_4)
    extrude(amount=-EXTRUDE_9_DEPTH)

    # Эскиз39 → Вырез-Вытянуть26 (cut, through all)
    with BuildSketch(Plane.XY.offset(10)):
        with Locations((-15, 13.5)):
            Circle(SKETCH_39_R)
        with Locations((-15, -3.5)):
            Circle(SKETCH_39_R)
        with Locations((15, 13.5)):
            Circle(SKETCH_39_R)
        with Locations((15, -3.5)):
            Circle(SKETCH_39_R)
    extrude(amount=-CUT_EXTRUDE_26_DEPTH, mode=Mode.SUBTRACT)

    # Эскиз40 → Бобышка-Вытянуть10 (add)
    # profile 1 of 2: a face of its own
    with BuildSketch(Plane(origin=(0, 0, 3), x_dir=(-1, 0, 0), z_dir=(0, 0, -1))):
        with Locations((-15.5, 64)):
            Circle(SKETCH_40_R)
        with Locations((-15.5, 64)):
            Circle(SKETCH_40_R_2, mode=Mode.SUBTRACT)
    # profile 2 of 2: a face of its own
    with BuildSketch(Plane(origin=(0, 0, 3), x_dir=(-1, 0, 0), z_dir=(0, 0, -1))):
        with Locations((15.5, 64)):
            Circle(SKETCH_40_R_3)
        with Locations((15.5, 64)):
            Circle(SKETCH_40_R_2, mode=Mode.SUBTRACT)
    extrude(amount=-EXTRUDE_10_DEPTH)

    # Эскиз41 → Вырез-Вытянуть28 (cut)
    with BuildSketch(Plane(origin=(0, 0, 3), x_dir=(-1, 0, 0), z_dir=(0, 0, -1))):
        with Locations((-15, 13.5)):
            Circle(SKETCH_41_R)
        with Locations((15, 13.5)):
            Circle(SKETCH_41_R)
        with Locations((15, -3.5)):
            Circle(SKETCH_41_R)
        with Locations((-15, -3.5)):
            Circle(SKETCH_41_R)
    extrude(amount=-CUT_EXTRUDE_28_DEPTH, mode=Mode.SUBTRACT)

    # Скругление3
    fillet_3_edges = [part.edges().sort_by_distance(p)[0] for p in [
        (-11.5, -3.5, 3),
        (18.5, -3.5, 3),
        (18.5, 13.5, 3),
        (-11.5, 13.5, 3),
    ]]
    fillet(fillet_3_edges, radius=FILLET_3_R)

    # Эскиз42 → Вырез-Вытянуть29 (cut)
    with BuildSketch(Plane(origin=(0, 0, 3), x_dir=(-1, 0, 0), z_dir=(0, 0, -1))):
        with Locations((-10.5, 54)):
            Circle(SKETCH_42_R)
        with Locations((10.5, 54)):
            Circle(SKETCH_42_R)
        with Locations((10.5, 26)):
            Circle(SKETCH_42_R)
        with Locations((-10.5, 26)):
            Circle(SKETCH_42_R)
        with Locations((-10.5, -16)):
            Circle(SKETCH_42_R)
        with Locations((10.5, -16)):
            Circle(SKETCH_42_R)
        with Locations((-10.5, -44)):
            Circle(SKETCH_42_R)
        with Locations((10.5, -44)):
            Circle(SKETCH_42_R)
    extrude(amount=-CUT_EXTRUDE_29_DEPTH, mode=Mode.SUBTRACT)

    # Скругление4
    fillet_4_edges = [part.edges().sort_by_distance(p)[0] for p in [
        (15.5, 54, 3),
        (-5.5, 54, 3),
        (-5.5, 26, 3),
        (15.5, 26, 3),
        (15.5, -16, 3),
        (-5.5, -16, 3),
        (15.5, -44, 3),
        (-5.5, -44, 3),
    ]]
    fillet(fillet_4_edges, radius=FILLET_4_R)

    # Эскиз43 → Бобышка-Вытянуть11 (add)
    with BuildSketch(Plane(origin=(0, 0, 0), x_dir=(-1, 0, 0), z_dir=(0, 0, -1))):
        with Locations((-21.35, 7.5)):
            Rectangle(SKETCH_43_W, SKETCH_43_H)
        with Locations((21.35, 7.5)):
            Rectangle(SKETCH_43_W, SKETCH_43_H)
    extrude(amount=-EXTRUDE_11_DEPTH)


solid = part.part
